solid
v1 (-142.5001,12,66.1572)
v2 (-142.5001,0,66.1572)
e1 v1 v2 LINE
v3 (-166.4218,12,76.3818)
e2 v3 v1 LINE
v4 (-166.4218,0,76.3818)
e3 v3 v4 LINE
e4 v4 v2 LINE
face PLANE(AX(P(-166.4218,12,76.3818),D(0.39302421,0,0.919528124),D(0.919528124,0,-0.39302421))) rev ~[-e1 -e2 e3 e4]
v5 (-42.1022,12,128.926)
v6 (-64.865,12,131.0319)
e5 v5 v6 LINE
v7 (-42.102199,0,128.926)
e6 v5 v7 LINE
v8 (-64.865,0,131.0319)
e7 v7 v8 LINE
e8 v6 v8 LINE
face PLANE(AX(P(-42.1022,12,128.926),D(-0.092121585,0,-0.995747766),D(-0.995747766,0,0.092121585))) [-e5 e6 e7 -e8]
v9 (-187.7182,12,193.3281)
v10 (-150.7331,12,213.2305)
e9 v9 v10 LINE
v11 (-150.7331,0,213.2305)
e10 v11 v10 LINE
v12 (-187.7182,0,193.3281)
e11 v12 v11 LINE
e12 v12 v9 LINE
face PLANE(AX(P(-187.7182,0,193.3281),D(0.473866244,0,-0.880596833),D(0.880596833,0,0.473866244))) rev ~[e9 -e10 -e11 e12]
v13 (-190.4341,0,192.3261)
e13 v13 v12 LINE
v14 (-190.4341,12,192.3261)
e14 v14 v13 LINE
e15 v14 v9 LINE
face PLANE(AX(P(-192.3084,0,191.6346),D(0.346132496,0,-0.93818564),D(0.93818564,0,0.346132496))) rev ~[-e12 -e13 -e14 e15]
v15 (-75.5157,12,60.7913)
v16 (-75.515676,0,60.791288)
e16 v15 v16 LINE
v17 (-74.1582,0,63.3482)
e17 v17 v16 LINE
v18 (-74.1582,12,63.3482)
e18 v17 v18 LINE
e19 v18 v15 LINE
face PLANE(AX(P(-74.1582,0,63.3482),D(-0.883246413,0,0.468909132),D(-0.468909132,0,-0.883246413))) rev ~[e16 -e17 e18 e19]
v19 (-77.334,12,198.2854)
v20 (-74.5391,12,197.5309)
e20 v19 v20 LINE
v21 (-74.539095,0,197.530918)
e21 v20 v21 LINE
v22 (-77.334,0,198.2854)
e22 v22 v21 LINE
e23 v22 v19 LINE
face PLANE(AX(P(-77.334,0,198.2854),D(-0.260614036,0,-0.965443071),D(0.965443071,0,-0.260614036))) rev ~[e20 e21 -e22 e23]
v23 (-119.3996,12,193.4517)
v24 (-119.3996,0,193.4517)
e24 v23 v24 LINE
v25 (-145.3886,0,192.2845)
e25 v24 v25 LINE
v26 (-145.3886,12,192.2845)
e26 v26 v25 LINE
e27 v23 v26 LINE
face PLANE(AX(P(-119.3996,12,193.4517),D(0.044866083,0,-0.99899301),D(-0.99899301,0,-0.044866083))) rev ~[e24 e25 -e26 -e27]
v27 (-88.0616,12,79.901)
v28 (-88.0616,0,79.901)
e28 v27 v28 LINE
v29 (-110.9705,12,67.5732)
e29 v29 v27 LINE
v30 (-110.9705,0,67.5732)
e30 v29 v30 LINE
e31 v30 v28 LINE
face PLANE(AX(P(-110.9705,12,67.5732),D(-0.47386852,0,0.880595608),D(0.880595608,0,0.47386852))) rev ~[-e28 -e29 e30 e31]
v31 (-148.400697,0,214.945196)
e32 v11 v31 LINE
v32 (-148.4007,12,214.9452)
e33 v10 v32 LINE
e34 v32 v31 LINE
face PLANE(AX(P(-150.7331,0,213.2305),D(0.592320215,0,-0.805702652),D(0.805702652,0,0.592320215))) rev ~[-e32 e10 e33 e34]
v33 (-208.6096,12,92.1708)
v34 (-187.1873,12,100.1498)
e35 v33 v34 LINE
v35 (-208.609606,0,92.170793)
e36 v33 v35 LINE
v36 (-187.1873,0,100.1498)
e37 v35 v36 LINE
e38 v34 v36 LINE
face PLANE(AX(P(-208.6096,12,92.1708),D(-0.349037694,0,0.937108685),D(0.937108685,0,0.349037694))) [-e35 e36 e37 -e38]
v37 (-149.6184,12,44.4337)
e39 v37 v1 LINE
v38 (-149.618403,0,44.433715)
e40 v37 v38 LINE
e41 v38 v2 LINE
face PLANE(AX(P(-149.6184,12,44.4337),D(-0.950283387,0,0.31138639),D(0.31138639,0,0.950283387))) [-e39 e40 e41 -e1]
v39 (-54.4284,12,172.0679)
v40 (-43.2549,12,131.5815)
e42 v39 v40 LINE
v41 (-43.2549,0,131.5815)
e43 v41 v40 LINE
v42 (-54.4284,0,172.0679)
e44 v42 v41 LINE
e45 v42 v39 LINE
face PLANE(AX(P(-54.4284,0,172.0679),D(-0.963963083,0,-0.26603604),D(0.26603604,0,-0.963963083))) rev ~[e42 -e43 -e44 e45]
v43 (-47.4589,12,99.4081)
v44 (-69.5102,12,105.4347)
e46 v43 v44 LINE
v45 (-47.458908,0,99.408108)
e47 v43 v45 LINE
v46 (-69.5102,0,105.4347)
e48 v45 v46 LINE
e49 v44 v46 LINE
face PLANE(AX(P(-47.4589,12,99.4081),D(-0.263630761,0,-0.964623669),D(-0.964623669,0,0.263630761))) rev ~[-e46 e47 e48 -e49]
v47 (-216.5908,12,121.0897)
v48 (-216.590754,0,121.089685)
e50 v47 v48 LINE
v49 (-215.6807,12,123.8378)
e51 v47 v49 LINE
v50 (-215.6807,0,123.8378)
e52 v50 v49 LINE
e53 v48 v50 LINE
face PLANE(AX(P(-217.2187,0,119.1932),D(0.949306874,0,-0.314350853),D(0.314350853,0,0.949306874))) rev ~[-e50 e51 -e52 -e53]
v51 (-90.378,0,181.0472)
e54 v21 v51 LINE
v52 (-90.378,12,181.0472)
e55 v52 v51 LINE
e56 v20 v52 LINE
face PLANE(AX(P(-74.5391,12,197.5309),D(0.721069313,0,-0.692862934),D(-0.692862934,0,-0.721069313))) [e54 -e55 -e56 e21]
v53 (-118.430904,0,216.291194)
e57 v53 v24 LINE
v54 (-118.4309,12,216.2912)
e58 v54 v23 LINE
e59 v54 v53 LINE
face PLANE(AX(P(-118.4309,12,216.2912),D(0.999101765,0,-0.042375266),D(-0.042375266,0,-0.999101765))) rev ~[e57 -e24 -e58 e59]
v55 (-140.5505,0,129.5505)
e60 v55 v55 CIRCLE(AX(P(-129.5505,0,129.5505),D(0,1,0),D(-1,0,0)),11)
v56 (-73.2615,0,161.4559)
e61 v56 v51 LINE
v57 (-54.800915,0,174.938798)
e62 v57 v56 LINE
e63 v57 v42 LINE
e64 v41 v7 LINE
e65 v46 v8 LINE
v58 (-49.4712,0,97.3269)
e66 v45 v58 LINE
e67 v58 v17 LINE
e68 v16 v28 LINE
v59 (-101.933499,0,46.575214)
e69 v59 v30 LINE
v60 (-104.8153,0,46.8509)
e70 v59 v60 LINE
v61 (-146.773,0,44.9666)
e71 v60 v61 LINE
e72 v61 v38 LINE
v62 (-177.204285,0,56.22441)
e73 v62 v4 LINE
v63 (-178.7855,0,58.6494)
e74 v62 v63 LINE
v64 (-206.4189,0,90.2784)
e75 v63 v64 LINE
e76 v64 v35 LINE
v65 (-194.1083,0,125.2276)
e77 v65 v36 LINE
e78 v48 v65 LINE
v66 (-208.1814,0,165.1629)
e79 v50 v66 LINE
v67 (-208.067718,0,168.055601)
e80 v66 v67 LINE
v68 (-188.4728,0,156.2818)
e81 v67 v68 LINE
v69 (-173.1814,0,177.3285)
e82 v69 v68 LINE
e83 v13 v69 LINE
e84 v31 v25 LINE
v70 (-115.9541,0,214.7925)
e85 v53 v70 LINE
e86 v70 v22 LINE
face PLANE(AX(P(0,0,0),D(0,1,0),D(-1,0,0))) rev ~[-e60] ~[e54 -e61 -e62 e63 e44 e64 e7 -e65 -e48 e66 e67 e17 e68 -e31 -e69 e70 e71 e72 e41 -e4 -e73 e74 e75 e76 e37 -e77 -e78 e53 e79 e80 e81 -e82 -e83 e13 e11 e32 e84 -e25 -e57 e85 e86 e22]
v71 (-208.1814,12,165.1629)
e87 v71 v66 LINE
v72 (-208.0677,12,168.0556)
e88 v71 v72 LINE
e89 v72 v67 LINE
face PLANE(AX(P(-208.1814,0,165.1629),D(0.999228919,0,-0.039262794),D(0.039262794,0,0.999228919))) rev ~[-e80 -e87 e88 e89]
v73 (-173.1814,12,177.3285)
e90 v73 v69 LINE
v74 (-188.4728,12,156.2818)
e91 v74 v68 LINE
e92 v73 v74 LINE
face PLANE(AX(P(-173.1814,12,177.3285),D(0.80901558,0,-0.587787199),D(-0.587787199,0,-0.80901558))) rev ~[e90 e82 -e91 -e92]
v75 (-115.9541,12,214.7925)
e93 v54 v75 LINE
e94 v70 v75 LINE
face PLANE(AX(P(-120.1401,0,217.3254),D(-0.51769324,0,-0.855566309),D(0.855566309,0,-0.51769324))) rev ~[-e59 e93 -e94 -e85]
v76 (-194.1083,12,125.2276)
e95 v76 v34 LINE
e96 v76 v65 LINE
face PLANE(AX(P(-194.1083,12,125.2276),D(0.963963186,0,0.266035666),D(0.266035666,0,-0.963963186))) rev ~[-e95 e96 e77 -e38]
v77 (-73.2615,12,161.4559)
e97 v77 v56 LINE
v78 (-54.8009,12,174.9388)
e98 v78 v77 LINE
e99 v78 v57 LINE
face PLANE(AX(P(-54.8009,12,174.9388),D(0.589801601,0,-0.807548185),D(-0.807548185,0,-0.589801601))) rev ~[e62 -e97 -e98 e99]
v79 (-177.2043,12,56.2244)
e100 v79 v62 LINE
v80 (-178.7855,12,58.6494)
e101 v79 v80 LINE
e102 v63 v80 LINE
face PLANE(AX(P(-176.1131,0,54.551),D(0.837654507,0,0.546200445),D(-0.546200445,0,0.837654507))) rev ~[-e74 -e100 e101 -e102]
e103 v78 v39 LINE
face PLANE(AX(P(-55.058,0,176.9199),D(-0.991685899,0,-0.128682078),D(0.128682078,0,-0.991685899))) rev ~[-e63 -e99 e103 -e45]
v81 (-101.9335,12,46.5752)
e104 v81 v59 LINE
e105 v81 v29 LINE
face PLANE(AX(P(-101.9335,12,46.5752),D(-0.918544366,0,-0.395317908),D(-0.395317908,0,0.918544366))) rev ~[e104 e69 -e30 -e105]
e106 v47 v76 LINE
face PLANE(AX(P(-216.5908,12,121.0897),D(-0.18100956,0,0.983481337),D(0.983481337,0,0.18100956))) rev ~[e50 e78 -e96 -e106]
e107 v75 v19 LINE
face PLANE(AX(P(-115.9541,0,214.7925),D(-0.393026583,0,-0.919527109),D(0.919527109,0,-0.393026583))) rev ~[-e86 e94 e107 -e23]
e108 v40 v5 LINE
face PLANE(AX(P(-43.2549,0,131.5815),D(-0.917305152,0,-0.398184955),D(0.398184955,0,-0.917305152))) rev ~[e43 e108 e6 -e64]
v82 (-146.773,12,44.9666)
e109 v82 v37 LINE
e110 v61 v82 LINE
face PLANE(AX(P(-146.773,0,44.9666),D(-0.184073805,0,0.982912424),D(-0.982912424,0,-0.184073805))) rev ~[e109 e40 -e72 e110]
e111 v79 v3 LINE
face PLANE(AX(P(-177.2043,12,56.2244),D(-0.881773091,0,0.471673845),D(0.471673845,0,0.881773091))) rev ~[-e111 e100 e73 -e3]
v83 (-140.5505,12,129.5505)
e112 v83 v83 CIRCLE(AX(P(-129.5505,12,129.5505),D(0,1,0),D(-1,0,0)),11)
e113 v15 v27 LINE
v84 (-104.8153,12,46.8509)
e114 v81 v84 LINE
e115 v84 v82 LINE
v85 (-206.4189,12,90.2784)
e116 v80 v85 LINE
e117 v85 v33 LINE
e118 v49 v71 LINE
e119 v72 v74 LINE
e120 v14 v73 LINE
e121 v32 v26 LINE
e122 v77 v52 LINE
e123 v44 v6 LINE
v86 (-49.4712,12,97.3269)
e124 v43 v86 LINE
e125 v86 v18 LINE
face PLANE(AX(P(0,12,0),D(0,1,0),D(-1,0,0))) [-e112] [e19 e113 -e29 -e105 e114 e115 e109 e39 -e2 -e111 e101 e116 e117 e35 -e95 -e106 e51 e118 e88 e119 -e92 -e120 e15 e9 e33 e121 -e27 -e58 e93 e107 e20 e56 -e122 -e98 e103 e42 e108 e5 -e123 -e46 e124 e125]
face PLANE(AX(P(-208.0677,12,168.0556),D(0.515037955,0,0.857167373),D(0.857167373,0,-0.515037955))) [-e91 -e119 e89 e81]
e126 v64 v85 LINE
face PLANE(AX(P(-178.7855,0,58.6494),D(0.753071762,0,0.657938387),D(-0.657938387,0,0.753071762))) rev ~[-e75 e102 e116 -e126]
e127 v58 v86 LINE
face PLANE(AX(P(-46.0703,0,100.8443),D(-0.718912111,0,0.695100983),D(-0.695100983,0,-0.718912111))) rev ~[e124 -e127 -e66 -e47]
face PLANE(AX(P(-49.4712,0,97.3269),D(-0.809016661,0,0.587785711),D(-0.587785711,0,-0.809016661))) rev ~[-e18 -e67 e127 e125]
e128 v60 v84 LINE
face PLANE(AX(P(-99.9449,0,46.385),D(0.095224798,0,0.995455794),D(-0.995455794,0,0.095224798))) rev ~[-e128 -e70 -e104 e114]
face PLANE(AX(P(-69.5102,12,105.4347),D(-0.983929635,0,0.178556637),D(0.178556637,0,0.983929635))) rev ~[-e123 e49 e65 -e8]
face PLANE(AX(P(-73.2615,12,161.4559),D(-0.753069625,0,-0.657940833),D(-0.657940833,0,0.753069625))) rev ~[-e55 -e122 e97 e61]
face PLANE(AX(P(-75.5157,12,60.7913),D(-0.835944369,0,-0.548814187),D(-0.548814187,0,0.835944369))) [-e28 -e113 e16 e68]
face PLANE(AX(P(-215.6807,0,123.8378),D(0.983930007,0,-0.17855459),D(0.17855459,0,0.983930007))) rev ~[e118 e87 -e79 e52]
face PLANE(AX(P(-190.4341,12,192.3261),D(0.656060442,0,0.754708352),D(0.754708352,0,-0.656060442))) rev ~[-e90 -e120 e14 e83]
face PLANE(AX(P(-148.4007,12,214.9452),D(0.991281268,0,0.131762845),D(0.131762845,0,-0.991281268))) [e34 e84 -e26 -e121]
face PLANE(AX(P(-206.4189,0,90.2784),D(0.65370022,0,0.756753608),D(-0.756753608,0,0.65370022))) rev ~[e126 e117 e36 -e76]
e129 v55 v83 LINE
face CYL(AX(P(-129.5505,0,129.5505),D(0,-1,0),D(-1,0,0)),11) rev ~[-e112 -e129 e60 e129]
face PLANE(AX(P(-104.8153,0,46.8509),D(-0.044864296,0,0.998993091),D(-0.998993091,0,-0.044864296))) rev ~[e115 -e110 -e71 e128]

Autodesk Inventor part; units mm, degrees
ref_plane "YZ Plane" through (0, 0, 0) normal (1, 0, 0) x (0, 1, 0)
ref_plane "XZ Plane" through (0, 0, 0) normal (0, 1, 0) x (-1, 0, 0)
ref_plane "XY Plane" through (0, 0, 0) normal (0, 0, 1) x (1, 0, 0)
sketch "Sketch2" plane through (0, 0, 0) normal (0, 1, 0) x (-1, 0, 0)
  line L0 (77.8598, 129.5505) -> (181.2412, 129.5505)
  line L1 (129.5505, 77.8598) -> (129.5505, 181.2412)
  line L2 (208.1814, 165.1629) -> (207.9893, 170.0518)
  line L3 (207.9893, 170.0518) -> (209.1581, 174.8028)
  line L4 (209.1581, 174.8028) -> (211.5965, 179.0445)
  line L5 (211.5965, 179.0445) -> (215.1139, 182.4454)
  line L6 (215.1139, 182.4454) -> (217.4859, 184.4007)
  line L7 (217.4859, 184.4007) -> (218.8706, 185.7147)
  line L8 (218.8706, 185.7147) -> (219.868, 187.3423)
  line L9 (219.868, 187.3423) -> (220.4102, 189.1727)
  line L10 (220.4102, 189.1727) -> (220.4602, 191.0809)
  line L11 (220.4602, 191.0809) -> (220.0145, 192.9371)
  line L12 (220.0145, 192.9371) -> (219.1037, 194.6147)
  line L13 (219.1037, 194.6147) -> (217.7897, 195.9994)
  line L14 (217.7897, 195.9994) -> (216.162, 196.9968)
  line L15 (216.162, 196.9968) -> (214.3317, 197.5389)
  line L16 (214.3317, 197.5389) -> (212.4235, 197.5889)
  line L17 (212.4235, 197.5889) -> (210.5673, 197.1433)
  line L18 (210.5673, 197.1433) -> (208.8897, 196.2324)
  line L19 (208.8897, 196.2324) -> (206.2971, 194.5807)
  line L20 (206.2971, 194.5807) -> (201.9757, 192.2864)
  line L21 (201.9757, 192.2864) -> (197.1881, 191.2781)
  line L22 (197.1881, 191.2781) -> (192.3084, 191.6346)
  line L23 (192.3084, 191.6346) -> (187.7182, 193.3281)
  line L24 (187.7182, 193.3281) -> (150.7331, 213.2305)
  line L25 (150.7331, 213.2305) -> (146.7911, 216.1285)
  line L26 (146.7911, 216.1285) -> (143.8054, 220.0046)
  line L27 (143.8054, 220.0046) -> (142.0094, 224.5557)
  line L28 (142.0094, 224.5557) -> (141.5435, 229.4261)
  line L29 (141.5435, 229.4261) -> (141.4937, 232.4997)
  line L30 (141.4937, 232.4997) -> (141.3297, 234.4016)
  line L31 (141.3297, 234.4016) -> (140.6791, 236.1962)
  line L32 (140.6791, 236.1962) -> (139.5861, 237.7613)
  line L33 (139.5861, 237.7613) -> (138.1253, 238.9901)
  line L34 (138.1253, 238.9901) -> (136.3963, 239.799)
  line L35 (136.3963, 239.799) -> (134.5168, 240.1329)
  line L36 (134.5168, 240.1329) -> (132.6149, 239.9689)
  line L37 (132.6149, 239.9689) -> (130.8203, 239.3182)
  line L38 (130.8203, 239.3182) -> (129.2552, 238.2252)
  line L39 (129.2552, 238.2252) -> (128.0264, 236.7645)
  line L40 (128.0264, 236.7645) -> (127.2175, 235.0354)
  line L41 (127.2175, 235.0354) -> (126.8836, 233.1559)
  line L42 (126.8836, 233.1559) -> (126.5586, 230.0991)
  line L43 (126.5586, 230.0991) -> (125.658, 225.29)
  line L44 (125.658, 225.29) -> (123.4612, 220.9182)
  line L45 (123.4612, 220.9182) -> (120.1401, 217.3254)
  line L46 (120.1401, 217.3254) -> (115.9541, 214.7925)
  line L47 (115.9541, 214.7925) -> (77.334, 198.2854)
  line L48 (77.334, 198.2854) -> (72.6104, 197.0103)
  line L49 (72.6104, 197.0103) -> (67.7184, 197.0926)
  line L50 (67.7184, 197.0926) -> (63.0404, 198.526)
  line L51 (63.0404, 198.526) -> (58.9421, 201.1984)
  line L52 (58.9421, 201.1984) -> (56.508, 203.0759)
  line L53 (56.508, 203.0759) -> (54.9188, 204.1335)
  line L54 (54.9188, 204.1335) -> (53.1101, 204.7437)
  line L55 (53.1101, 204.7437) -> (51.205, 204.865)
  line L56 (51.205, 204.865) -> (49.3334, 204.4891)
  line L57 (49.3334, 204.4891) -> (47.623, 203.6416)
  line L58 (47.623, 203.6416) -> (46.1901, 202.3802)
  line L59 (46.1901, 202.3802) -> (45.1326, 200.7911)
  line L60 (45.1326, 200.7911) -> (44.5223, 198.9823)
  line L61 (44.5223, 198.9823) -> (44.401, 197.0772)
  line L62 (44.401, 197.0772) -> (44.777, 195.2057)
  line L63 (44.777, 195.2057) -> (45.6245, 193.4952)
  line L64 (45.6245, 193.4952) -> (46.8858, 192.0624)
  line L65 (46.8858, 192.0624) -> (49.073, 189.9023)
  line L66 (49.073, 189.9023) -> (52.2714, 186.1998)
  line L67 (52.2714, 186.1998) -> (54.3197, 181.7566)
  line L68 (54.3197, 181.7566) -> (55.058, 176.9199)
  line L69 (55.058, 176.9199) -> (54.4284, 172.0679)
  line L70 (54.4284, 172.0679) -> (43.2549, 131.5815)
  line L71 (43.2549, 131.5815) -> (41.3067, 127.0934)
  line L72 (41.3067, 127.0934) -> (38.1923, 123.3201)
  line L73 (38.1923, 123.3201) -> (34.1549, 120.5564)
  line L74 (34.1549, 120.5564) -> (29.5103, 119.0184)
  line L75 (29.5103, 119.0184) -> (26.5248, 118.2859)
  line L76 (26.5248, 118.2859) -> (24.7071, 117.7028)
  line L77 (24.7071, 117.7028) -> (23.1023, 116.6692)
  line L78 (23.1023, 116.6692) -> (21.8196, 115.2553)
  line L79 (21.8196, 115.2553) -> (20.9467, 113.5577)
  line L80 (20.9467, 113.5577) -> (20.5428, 111.692)
  line L81 (20.5428, 111.692) -> (20.6356, 109.7853)
  line L82 (20.6356, 109.7853) -> (21.2187, 107.9677)
  line L83 (21.2187, 107.9677) -> (22.2523, 106.3628)
  line L84 (22.2523, 106.3628) -> (23.6661, 105.0802)
  line L85 (23.6661, 105.0802) -> (25.3638, 104.2072)
  line L86 (25.3638, 104.2072) -> (27.2295, 103.8034)
  line L87 (27.2295, 103.8034) -> (29.1361, 103.8961)
  line L88 (29.1361, 103.8961) -> (32.1886, 104.2594)
  line L89 (32.1886, 104.2594) -> (37.0775, 104.4515)
  line L90 (37.0775, 104.4515) -> (41.8285, 103.2827)
  line L91 (41.8285, 103.2827) -> (46.0703, 100.8443)
  line L92 (46.0703, 100.8443) -> (49.4712, 97.3269)
  line L93 (49.4712, 97.3269) -> (74.1582, 63.3482)
  line L94 (74.1582, 63.3482) -> (76.4524, 59.0268)
  line L95 (76.4524, 59.0268) -> (77.4607, 54.2392)
  line L96 (77.4607, 54.2392) -> (77.1042, 49.3595)
  line L97 (77.1042, 49.3595) -> (75.4108, 44.7692)
  line L98 (75.4108, 44.7692) -> (74.122, 41.9784)
  line L99 (74.122, 41.9784) -> (73.4446, 40.1937)
  line L100 (73.4446, 40.1937) -> (73.2521, 38.2945)
  line L101 (73.2521, 38.2945) -> (73.5578, 36.4102)
  line L102 (73.5578, 36.4102) -> (74.3407, 34.6693)
  line L103 (74.3407, 34.6693) -> (75.5476, 33.1902)
  line L104 (75.5476, 33.1902) -> (77.0961, 32.074)
  line L105 (77.0961, 32.074) -> (78.8808, 31.3966)
  line L106 (78.8808, 31.3966) -> (80.78, 31.2041)
  line L107 (80.78, 31.2041) -> (82.6643, 31.5098)
  line L108 (82.6643, 31.5098) -> (84.4053, 32.2927)
  line L109 (84.4053, 32.2927) -> (85.8843, 33.4996)
  line L110 (85.8843, 33.4996) -> (87.0006, 35.0481)
  line L111 (87.0006, 35.0481) -> (88.6197, 37.6612)
  line L112 (88.6197, 37.6612) -> (91.5177, 41.6033)
  line L113 (91.5177, 41.6033) -> (95.3937, 44.589)
  line L114 (95.3937, 44.589) -> (99.9449, 46.385)
  line L115 (99.9449, 46.385) -> (104.8153, 46.8509)
  line L116 (104.8153, 46.8509) -> (146.773, 44.9666)
  line L117 (146.773, 44.9666) -> (151.582, 44.066)
  line L118 (151.582, 44.066) -> (155.9538, 41.8692)
  line L119 (155.9538, 41.8692) -> (159.5466, 38.5481)
  line L120 (159.5466, 38.5481) -> (162.0796, 34.3621)
  line L121 (162.0796, 34.3621) -> (163.458, 31.6144)
  line L122 (163.458, 31.6144) -> (164.431, 29.9721)
  line L123 (164.431, 29.9721) -> (165.7958, 28.6375)
  line L124 (165.7958, 28.6375) -> (167.4596, 27.7016)
  line L125 (167.4596, 27.7016) -> (169.3089, 27.2283)
  line L126 (169.3089, 27.2283) -> (171.2177, 27.2497)
  line L127 (171.2177, 27.2497) -> (173.0559, 27.7644)
  line L128 (173.0559, 27.7644) -> (174.6983, 28.7374)
  line L129 (174.6983, 28.7374) -> (176.0329, 30.1023)
  line L130 (176.0329, 30.1023) -> (176.9687, 31.766)
  line L131 (176.9687, 31.766) -> (177.4421, 33.6153)
  line L132 (177.4421, 33.6153) -> (177.4207, 35.5241)
  line L133 (177.4207, 35.5241) -> (176.9059, 37.3624)
  line L134 (176.9059, 37.3624) -> (175.8725, 40.2575)
  line L135 (175.8725, 40.2575) -> (174.5974, 44.9811)
  line L136 (174.5974, 44.9811) -> (174.6797, 49.873)
  line L137 (174.6797, 49.873) -> (176.1131, 54.551)
  line L138 (176.1131, 54.551) -> (178.7855, 58.6494)
  line L139 (178.7855, 58.6494) -> (206.4189, 90.2784)
  line L140 (206.4189, 90.2784) -> (210.1214, 93.4767)
  line L141 (210.1214, 93.4767) -> (214.5647, 95.5251)
  line L142 (214.5647, 95.5251) -> (219.4013, 96.2633)
  line L143 (219.4013, 96.2633) -> (224.2533, 95.6338)
  line L144 (224.2533, 95.6338) -> (227.261, 94.9983)
  line L145 (227.261, 94.9983) -> (229.1516, 94.735)
  line L146 (229.1516, 94.735) -> (231.046, 94.97)
  line L147 (231.046, 94.97) -> (232.8151, 95.6873)
  line L148 (232.8151, 95.6873) -> (234.3382, 96.838)
  line L149 (234.3382, 96.838) -> (235.5115, 98.3438)
  line L150 (235.5115, 98.3438) -> (236.2552, 100.1018)
  line L151 (236.2552, 100.1018) -> (236.5185, 101.9925)
  line L152 (236.5185, 101.9925) -> (236.2835, 103.8869)
  line L153 (236.2835, 103.8869) -> (235.5662, 105.656)
  line L154 (235.5662, 105.656) -> (234.4155, 107.1791)
  line L155 (234.4155, 107.1791) -> (232.9098, 108.3524)
  line L156 (232.9098, 108.3524) -> (231.1517, 109.0961)
  line L157 (231.1517, 109.0961) -> (228.2439, 110.0932)
  line L158 (228.2439, 110.0932) -> (223.7558, 112.0414)
  line L159 (223.7558, 112.0414) -> (219.9824, 115.1559)
  line L160 (219.9824, 115.1559) -> (217.2187, 119.1932)
  line L161 (217.2187, 119.1932) -> (215.6807, 123.8378)
  line L162 (215.6807, 123.8378) -> (208.1814, 165.1629)
  circle A0 centre (129.5505, 129.5505) radius 10.75
  dimension "d0" = 21.5
extrude "Extrusion1" add sketch "Sketch2" along normal blind 12
thicken "Thicken1" operation add thickness 0.25 both sides no extend neighbours yes toward (-0.9870503, 0, -0.1604113) faces at (-140.1613, 8, 127.8261)
sketch "Sketch6" plane through (0, 12, 0) normal (0, 1, 0) x (1, 0, 0)
  circle A0 centre (-129.5505, -129.5505) radius 11 projected
  line L0 (-234.4155, -107.1791) -> (-232.9098, -108.3524) construction
  line L1 (-236.2552, -100.1018) -> (-236.5185, -101.9925) construction
  line L2 (-231.046, -94.97) -> (-232.8151, -95.6873) construction
  circle A1 centre (-229.2063, -102.0472) radius 7.2499 construction
  line L3 (-229.2063, -102.0472) -> (-129.5505, -129.5505) construction
  line L4 (-271.7554, -105.8652) -> (-194.6384, -127.1481) construction
  line L5 (-194.6384, -127.1481) -> (-186.6573, -98.2293) construction
  line L6 (-186.6573, -98.2293) -> (-263.7743, -76.9463) construction
  line L7 (-263.7743, -76.9463) -> (-271.7554, -105.8652) construction
  line L8 (-271.7554, -105.8652) -> (-186.6573, -98.2293) construction
  line L9 (-194.6384, -127.1481) -> (-263.7743, -76.9463) construction
  line L10 (-216.5908, -121.0897) -> (-194.1083, -125.2276)
  line L11 (-208.6096, -92.1708) -> (-187.1873, -100.1498)
  line L12 (-206.4189, -90.2784) -> (-210.1214, -93.4767) projected
  line L13 (-217.2187, -119.1932) -> (-215.6807, -123.8378) projected
  line L14 (-194.1083, -125.2276) -> (-187.1873, -100.1498)
  line L15 (-216.5908, -121.0897) -> (-245.6302, -113.0753)
  line L16 (-208.6096, -92.1708) -> (-237.649, -84.1564)
  line L17 (-245.6302, -113.0753) -> (-237.649, -84.1564)
  circle A2 centre (-213.1878, -190.3166) radius 7.2499 construction
  line L18 (-208.0677, -168.0556) -> (-232.4394, -185.7626)
  line L19 (-190.4341, -192.3261) -> (-214.8058, -210.0331)
  line L20 (-189.6439, -154.6699) -> (-254.3653, -201.6927) construction
  line L21 (-236.7317, -225.9632) -> (-189.6439, -154.6699) construction
  line L22 (-172.0104, -178.9404) -> (-254.3653, -201.6927) construction
  line L23 (-236.7317, -225.9632) -> (-172.0104, -178.9404) construction
  line L24 (-214.8058, -210.0331) -> (-232.4394, -185.7626)
  line L25 (-254.3653, -201.6927) -> (-236.7317, -225.9632) construction
  line L26 (-172.0104, -178.9404) -> (-189.6439, -154.6699) construction
  line L27 (-208.0677, -168.0556) -> (-188.4728, -156.2818)
  line L28 (-190.4341, -192.3261) -> (-173.1814, -177.3285)
  line L29 (-173.1814, -177.3285) -> (-188.4728, -156.2818)
  circle A3 centre (-134.1887, -232.8278) radius 7.2499 construction
  line L30 (-148.4007, -214.9452) -> (-149.7522, -245.0399)
  line L31 (-118.4309, -216.2912) -> (-119.7825, -246.3859)
  line L32 (-147.379, -192.1951) -> (-150.9682, -272.1146) construction
  line L33 (-120.9984, -273.4605) -> (-147.379, -192.1951) construction
  line L34 (-117.4092, -193.5411) -> (-150.9682, -272.1146) construction
  line L35 (-120.9984, -273.4605) -> (-117.4092, -193.5411) construction
  line L36 (-119.7825, -246.3859) -> (-149.7522, -245.0399)
  line L37 (-150.9682, -272.1146) -> (-120.9984, -273.4605) construction
  line L38 (-117.4092, -193.5411) -> (-147.379, -192.1951) construction
  line L39 (-148.4007, -214.9452) -> (-145.3886, -192.2845)
  line L40 (-118.4309, -216.2912) -> (-119.3996, -193.4517)
  line L41 (-119.3996, -193.4517) -> (-145.3886, -192.2845)
  circle A4 centre (-51.6969, -197.5691) radius 7.2499 construction
  line L42 (-74.5391, -197.5309) -> (-51.8528, -217.3513)
  line L43 (-54.8009, -174.9388) -> (-32.1146, -194.7592)
  line L44 (-91.6888, -182.5477) -> (-31.4431, -235.1827) construction
  line L45 (-11.705, -212.5906) -> (-91.6888, -182.5477) construction
  line L46 (-71.9507, -159.9555) -> (-31.4431, -235.1827) construction
  line L47 (-11.705, -212.5906) -> (-71.9507, -159.9555) construction
  line L48 (-32.1146, -194.7592) -> (-51.8528, -217.3513)
  line L49 (-31.4431, -235.1827) -> (-11.705, -212.5906) construction
  line L50 (-71.9507, -159.9555) -> (-91.6888, -182.5477) construction
  line L51 (-74.5391, -197.5309) -> (-90.378, -181.0472)
  line L52 (-54.8009, -174.9388) -> (-73.2615, -161.4559)
  line L53 (-73.2615, -161.4559) -> (-90.378, -181.0472)
  circle A5 centre (-27.8305, -111.091) radius 7.2499 construction
  line L54 (-42.1022, -128.926) -> (-12.4613, -123.5469)
  line L55 (-47.4589, -99.4081) -> (-17.818, -94.029)
  line L56 (-64.5093, -132.9922) -> (14.2051, -118.7077) construction
  line L57 (8.8484, -89.1898) -> (-64.5093, -132.9922) construction
  line L58 (-69.866, -103.4744) -> (14.2051, -118.7077) construction
  line L59 (8.8484, -89.1898) -> (-69.866, -103.4744) construction
  line L60 (-17.818, -94.029) -> (-12.4613, -123.5469)
  line L61 (14.2051, -118.7077) -> (8.8484, -89.1898) construction
  line L62 (-69.866, -103.4744) -> (-64.5093, -132.9922) construction
  line L63 (-42.1022, -128.926) -> (-64.865, -131.0319)
  line L64 (-47.4589, -99.4081) -> (-69.5102, -105.4347)
  line L65 (-69.5102, -105.4347) -> (-64.865, -131.0319)
  circle A6 centre (-80.5613, -38.5133) radius 7.2499 construction
  line L66 (-75.5157, -60.7913) -> (-61.2404, -34.2633)
  line L67 (-101.9335, -46.5752) -> (-87.6582, -20.0473)
  line L68 (-86.3071, -80.8451) -> (-48.3976, -10.3975) construction
  line L69 (-74.8155, 3.8186) -> (-86.3071, -80.8451) construction
  line L70 (-112.725, -66.6291) -> (-48.3976, -10.3975) construction
  line L71 (-74.8155, 3.8186) -> (-112.725, -66.6291) construction
  line L72 (-87.6582, -20.0473) -> (-61.2404, -34.2633)
  line L73 (-48.3976, -10.3975) -> (-74.8155, 3.8186) construction
  line L74 (-112.725, -66.6291) -> (-86.3071, -80.8451) construction
  line L75 (-75.5157, -60.7913) -> (-88.0616, -79.901)
  line L76 (-101.9335, -46.5752) -> (-110.9705, -67.5732)
  line L77 (-110.9705, -67.5732) -> (-88.0616, -79.901)
  circle A7 centre (-170.182, -34.4884) radius 7.2499 construction
  line L78 (-149.6184, -44.4337) -> (-161.4583, -16.7329)
  line L79 (-177.2043, -56.2244) -> (-189.0442, -28.5236)
  line L80 (-140.6681, -65.3741) -> (-172.1101, 8.1881) construction
  line L81 (-199.6959, -3.6027) -> (-140.6681, -65.3741) construction
  line L82 (-168.2539, -77.1649) -> (-172.1101, 8.1881) construction
  line L83 (-199.6959, -3.6027) -> (-168.2539, -77.1649) construction
  line L84 (-189.0442, -28.5236) -> (-161.4583, -16.7329)
  line L85 (-172.1101, 8.1881) -> (-199.6959, -3.6027) construction
  line L86 (-168.2539, -77.1649) -> (-140.6681, -65.3741) construction
  line L87 (-149.6184, -44.4337) -> (-142.5001, -66.1572)
  line L88 (-177.2043, -56.2244) -> (-166.4218, -76.3818)
  line L89 (-166.4218, -76.3818) -> (-142.5001, -66.1572)
  point P0 (0, 0)
  dimension "d21" = 30
  dimension "d22" = 40
  dimension "d23" = 85
  dimension "d24" = 85
  dimension "d27" = 360
extrude "Extrusion3" cut sketch "Sketch6" against normal through all contours L15 L17 L16 L11 L14 L10 | L27 L29 L28 L19 L24 L18 | L39 L41 L40 L31 L36 L30 | L51 L53 L52 L43 L48 L42 | L63 L65 L64 L55 L60 L54 | L75 L77 L76 L67 L72 L66 | L87 L89 L88 L79 L84 L78
sketch "Sketch7" plane through (0, 12, 0) normal (0, 1, 0) x (1, 0, 0)
  circle A0 centre (-129.5505, -129.5505) radius 11 projected
  line L0 (-75.5157, -60.7913) -> (-88.0616, -79.901) projected
  line L1 (-88.0616, -79.901) -> (-110.9705, -67.5732) projected
  line L2 (-110.9705, -67.5732) -> (-101.9335, -46.5752) projected
  line L3 (-101.9335, -46.5752) -> (-104.8153, -46.8509) projected
  line L4 (-104.8153, -46.8509) -> (-146.773, -44.9666) projected
  line L5 (-146.773, -44.9666) -> (-149.6184, -44.4337) projected
  line L6 (-149.6184, -44.4337) -> (-142.5001, -66.1572) projected
  line L7 (-142.5001, -66.1572) -> (-166.4218, -76.3818) projected
  line L8 (-166.4218, -76.3818) -> (-177.2043, -56.2244) projected
  line L9 (-177.2043, -56.2244) -> (-178.7855, -58.6494) projected
  line L10 (-178.7855, -58.6494) -> (-206.4189, -90.2784) projected
  line L11 (-206.4189, -90.2784) -> (-208.6096, -92.1708) projected
  line L12 (-208.6096, -92.1708) -> (-187.1873, -100.1498) projected
  line L13 (-187.1873, -100.1498) -> (-194.1083, -125.2276) projected
  line L14 (-194.1083, -125.2276) -> (-216.5908, -121.0897) projected
  line L15 (-216.5908, -121.0897) -> (-215.6807, -123.8378) projected
  line L16 (-215.6807, -123.8378) -> (-208.1814, -165.1629) projected
  line L17 (-208.1814, -165.1629) -> (-208.0677, -168.0556) projected
  line L18 (-208.0677, -168.0556) -> (-188.4728, -156.2818) projected
  line L19 (-188.4728, -156.2818) -> (-173.1814, -177.3285) projected
  line L20 (-173.1814, -177.3285) -> (-190.4341, -192.3261) projected
  line L21 (-190.4341, -192.3261) -> (-187.7182, -193.3281) projected
  line L22 (-187.7182, -193.3281) -> (-150.7331, -213.2305) projected
  line L23 (-150.7331, -213.2305) -> (-148.4007, -214.9452) projected
  line L24 (-148.4007, -214.9452) -> (-145.3886, -192.2845) projected
  line L25 (-145.3886, -192.2845) -> (-119.3996, -193.4517) projected
  line L26 (-119.3996, -193.4517) -> (-118.4309, -216.2912) projected
  line L27 (-118.4309, -216.2912) -> (-115.9541, -214.7925) projected
  line L28 (-115.9541, -214.7925) -> (-77.334, -198.2854) projected
  line L29 (-77.334, -198.2854) -> (-74.5391, -197.5309) projected
  line L30 (-74.5391, -197.5309) -> (-90.378, -181.0472) projected
  line L31 (-90.378, -181.0472) -> (-73.2615, -161.4559) projected
  line L32 (-73.2615, -161.4559) -> (-54.8009, -174.9388) projected
  line L33 (-54.8009, -174.9388) -> (-54.4284, -172.0679) projected
  line L34 (-54.4284, -172.0679) -> (-43.2549, -131.5815) projected
  line L35 (-43.2549, -131.5815) -> (-42.1022, -128.926) projected
  line L36 (-42.1022, -128.926) -> (-64.865, -131.0319) projected
  line L37 (-64.865, -131.0319) -> (-69.5102, -105.4347) projected
  line L38 (-69.5102, -105.4347) -> (-47.4589, -99.4081) projected
  line L39 (-47.4589, -99.4081) -> (-49.4712, -97.3269) projected
  line L40 (-49.4712, -97.3269) -> (-74.1582, -63.3482) projected
  line L41 (-74.1582, -63.3482) -> (-75.5157, -60.7913) projected
  point P0 (0, 0)
equation "\"d24\" = d23"
properties part number "sprocket7_mk2"
